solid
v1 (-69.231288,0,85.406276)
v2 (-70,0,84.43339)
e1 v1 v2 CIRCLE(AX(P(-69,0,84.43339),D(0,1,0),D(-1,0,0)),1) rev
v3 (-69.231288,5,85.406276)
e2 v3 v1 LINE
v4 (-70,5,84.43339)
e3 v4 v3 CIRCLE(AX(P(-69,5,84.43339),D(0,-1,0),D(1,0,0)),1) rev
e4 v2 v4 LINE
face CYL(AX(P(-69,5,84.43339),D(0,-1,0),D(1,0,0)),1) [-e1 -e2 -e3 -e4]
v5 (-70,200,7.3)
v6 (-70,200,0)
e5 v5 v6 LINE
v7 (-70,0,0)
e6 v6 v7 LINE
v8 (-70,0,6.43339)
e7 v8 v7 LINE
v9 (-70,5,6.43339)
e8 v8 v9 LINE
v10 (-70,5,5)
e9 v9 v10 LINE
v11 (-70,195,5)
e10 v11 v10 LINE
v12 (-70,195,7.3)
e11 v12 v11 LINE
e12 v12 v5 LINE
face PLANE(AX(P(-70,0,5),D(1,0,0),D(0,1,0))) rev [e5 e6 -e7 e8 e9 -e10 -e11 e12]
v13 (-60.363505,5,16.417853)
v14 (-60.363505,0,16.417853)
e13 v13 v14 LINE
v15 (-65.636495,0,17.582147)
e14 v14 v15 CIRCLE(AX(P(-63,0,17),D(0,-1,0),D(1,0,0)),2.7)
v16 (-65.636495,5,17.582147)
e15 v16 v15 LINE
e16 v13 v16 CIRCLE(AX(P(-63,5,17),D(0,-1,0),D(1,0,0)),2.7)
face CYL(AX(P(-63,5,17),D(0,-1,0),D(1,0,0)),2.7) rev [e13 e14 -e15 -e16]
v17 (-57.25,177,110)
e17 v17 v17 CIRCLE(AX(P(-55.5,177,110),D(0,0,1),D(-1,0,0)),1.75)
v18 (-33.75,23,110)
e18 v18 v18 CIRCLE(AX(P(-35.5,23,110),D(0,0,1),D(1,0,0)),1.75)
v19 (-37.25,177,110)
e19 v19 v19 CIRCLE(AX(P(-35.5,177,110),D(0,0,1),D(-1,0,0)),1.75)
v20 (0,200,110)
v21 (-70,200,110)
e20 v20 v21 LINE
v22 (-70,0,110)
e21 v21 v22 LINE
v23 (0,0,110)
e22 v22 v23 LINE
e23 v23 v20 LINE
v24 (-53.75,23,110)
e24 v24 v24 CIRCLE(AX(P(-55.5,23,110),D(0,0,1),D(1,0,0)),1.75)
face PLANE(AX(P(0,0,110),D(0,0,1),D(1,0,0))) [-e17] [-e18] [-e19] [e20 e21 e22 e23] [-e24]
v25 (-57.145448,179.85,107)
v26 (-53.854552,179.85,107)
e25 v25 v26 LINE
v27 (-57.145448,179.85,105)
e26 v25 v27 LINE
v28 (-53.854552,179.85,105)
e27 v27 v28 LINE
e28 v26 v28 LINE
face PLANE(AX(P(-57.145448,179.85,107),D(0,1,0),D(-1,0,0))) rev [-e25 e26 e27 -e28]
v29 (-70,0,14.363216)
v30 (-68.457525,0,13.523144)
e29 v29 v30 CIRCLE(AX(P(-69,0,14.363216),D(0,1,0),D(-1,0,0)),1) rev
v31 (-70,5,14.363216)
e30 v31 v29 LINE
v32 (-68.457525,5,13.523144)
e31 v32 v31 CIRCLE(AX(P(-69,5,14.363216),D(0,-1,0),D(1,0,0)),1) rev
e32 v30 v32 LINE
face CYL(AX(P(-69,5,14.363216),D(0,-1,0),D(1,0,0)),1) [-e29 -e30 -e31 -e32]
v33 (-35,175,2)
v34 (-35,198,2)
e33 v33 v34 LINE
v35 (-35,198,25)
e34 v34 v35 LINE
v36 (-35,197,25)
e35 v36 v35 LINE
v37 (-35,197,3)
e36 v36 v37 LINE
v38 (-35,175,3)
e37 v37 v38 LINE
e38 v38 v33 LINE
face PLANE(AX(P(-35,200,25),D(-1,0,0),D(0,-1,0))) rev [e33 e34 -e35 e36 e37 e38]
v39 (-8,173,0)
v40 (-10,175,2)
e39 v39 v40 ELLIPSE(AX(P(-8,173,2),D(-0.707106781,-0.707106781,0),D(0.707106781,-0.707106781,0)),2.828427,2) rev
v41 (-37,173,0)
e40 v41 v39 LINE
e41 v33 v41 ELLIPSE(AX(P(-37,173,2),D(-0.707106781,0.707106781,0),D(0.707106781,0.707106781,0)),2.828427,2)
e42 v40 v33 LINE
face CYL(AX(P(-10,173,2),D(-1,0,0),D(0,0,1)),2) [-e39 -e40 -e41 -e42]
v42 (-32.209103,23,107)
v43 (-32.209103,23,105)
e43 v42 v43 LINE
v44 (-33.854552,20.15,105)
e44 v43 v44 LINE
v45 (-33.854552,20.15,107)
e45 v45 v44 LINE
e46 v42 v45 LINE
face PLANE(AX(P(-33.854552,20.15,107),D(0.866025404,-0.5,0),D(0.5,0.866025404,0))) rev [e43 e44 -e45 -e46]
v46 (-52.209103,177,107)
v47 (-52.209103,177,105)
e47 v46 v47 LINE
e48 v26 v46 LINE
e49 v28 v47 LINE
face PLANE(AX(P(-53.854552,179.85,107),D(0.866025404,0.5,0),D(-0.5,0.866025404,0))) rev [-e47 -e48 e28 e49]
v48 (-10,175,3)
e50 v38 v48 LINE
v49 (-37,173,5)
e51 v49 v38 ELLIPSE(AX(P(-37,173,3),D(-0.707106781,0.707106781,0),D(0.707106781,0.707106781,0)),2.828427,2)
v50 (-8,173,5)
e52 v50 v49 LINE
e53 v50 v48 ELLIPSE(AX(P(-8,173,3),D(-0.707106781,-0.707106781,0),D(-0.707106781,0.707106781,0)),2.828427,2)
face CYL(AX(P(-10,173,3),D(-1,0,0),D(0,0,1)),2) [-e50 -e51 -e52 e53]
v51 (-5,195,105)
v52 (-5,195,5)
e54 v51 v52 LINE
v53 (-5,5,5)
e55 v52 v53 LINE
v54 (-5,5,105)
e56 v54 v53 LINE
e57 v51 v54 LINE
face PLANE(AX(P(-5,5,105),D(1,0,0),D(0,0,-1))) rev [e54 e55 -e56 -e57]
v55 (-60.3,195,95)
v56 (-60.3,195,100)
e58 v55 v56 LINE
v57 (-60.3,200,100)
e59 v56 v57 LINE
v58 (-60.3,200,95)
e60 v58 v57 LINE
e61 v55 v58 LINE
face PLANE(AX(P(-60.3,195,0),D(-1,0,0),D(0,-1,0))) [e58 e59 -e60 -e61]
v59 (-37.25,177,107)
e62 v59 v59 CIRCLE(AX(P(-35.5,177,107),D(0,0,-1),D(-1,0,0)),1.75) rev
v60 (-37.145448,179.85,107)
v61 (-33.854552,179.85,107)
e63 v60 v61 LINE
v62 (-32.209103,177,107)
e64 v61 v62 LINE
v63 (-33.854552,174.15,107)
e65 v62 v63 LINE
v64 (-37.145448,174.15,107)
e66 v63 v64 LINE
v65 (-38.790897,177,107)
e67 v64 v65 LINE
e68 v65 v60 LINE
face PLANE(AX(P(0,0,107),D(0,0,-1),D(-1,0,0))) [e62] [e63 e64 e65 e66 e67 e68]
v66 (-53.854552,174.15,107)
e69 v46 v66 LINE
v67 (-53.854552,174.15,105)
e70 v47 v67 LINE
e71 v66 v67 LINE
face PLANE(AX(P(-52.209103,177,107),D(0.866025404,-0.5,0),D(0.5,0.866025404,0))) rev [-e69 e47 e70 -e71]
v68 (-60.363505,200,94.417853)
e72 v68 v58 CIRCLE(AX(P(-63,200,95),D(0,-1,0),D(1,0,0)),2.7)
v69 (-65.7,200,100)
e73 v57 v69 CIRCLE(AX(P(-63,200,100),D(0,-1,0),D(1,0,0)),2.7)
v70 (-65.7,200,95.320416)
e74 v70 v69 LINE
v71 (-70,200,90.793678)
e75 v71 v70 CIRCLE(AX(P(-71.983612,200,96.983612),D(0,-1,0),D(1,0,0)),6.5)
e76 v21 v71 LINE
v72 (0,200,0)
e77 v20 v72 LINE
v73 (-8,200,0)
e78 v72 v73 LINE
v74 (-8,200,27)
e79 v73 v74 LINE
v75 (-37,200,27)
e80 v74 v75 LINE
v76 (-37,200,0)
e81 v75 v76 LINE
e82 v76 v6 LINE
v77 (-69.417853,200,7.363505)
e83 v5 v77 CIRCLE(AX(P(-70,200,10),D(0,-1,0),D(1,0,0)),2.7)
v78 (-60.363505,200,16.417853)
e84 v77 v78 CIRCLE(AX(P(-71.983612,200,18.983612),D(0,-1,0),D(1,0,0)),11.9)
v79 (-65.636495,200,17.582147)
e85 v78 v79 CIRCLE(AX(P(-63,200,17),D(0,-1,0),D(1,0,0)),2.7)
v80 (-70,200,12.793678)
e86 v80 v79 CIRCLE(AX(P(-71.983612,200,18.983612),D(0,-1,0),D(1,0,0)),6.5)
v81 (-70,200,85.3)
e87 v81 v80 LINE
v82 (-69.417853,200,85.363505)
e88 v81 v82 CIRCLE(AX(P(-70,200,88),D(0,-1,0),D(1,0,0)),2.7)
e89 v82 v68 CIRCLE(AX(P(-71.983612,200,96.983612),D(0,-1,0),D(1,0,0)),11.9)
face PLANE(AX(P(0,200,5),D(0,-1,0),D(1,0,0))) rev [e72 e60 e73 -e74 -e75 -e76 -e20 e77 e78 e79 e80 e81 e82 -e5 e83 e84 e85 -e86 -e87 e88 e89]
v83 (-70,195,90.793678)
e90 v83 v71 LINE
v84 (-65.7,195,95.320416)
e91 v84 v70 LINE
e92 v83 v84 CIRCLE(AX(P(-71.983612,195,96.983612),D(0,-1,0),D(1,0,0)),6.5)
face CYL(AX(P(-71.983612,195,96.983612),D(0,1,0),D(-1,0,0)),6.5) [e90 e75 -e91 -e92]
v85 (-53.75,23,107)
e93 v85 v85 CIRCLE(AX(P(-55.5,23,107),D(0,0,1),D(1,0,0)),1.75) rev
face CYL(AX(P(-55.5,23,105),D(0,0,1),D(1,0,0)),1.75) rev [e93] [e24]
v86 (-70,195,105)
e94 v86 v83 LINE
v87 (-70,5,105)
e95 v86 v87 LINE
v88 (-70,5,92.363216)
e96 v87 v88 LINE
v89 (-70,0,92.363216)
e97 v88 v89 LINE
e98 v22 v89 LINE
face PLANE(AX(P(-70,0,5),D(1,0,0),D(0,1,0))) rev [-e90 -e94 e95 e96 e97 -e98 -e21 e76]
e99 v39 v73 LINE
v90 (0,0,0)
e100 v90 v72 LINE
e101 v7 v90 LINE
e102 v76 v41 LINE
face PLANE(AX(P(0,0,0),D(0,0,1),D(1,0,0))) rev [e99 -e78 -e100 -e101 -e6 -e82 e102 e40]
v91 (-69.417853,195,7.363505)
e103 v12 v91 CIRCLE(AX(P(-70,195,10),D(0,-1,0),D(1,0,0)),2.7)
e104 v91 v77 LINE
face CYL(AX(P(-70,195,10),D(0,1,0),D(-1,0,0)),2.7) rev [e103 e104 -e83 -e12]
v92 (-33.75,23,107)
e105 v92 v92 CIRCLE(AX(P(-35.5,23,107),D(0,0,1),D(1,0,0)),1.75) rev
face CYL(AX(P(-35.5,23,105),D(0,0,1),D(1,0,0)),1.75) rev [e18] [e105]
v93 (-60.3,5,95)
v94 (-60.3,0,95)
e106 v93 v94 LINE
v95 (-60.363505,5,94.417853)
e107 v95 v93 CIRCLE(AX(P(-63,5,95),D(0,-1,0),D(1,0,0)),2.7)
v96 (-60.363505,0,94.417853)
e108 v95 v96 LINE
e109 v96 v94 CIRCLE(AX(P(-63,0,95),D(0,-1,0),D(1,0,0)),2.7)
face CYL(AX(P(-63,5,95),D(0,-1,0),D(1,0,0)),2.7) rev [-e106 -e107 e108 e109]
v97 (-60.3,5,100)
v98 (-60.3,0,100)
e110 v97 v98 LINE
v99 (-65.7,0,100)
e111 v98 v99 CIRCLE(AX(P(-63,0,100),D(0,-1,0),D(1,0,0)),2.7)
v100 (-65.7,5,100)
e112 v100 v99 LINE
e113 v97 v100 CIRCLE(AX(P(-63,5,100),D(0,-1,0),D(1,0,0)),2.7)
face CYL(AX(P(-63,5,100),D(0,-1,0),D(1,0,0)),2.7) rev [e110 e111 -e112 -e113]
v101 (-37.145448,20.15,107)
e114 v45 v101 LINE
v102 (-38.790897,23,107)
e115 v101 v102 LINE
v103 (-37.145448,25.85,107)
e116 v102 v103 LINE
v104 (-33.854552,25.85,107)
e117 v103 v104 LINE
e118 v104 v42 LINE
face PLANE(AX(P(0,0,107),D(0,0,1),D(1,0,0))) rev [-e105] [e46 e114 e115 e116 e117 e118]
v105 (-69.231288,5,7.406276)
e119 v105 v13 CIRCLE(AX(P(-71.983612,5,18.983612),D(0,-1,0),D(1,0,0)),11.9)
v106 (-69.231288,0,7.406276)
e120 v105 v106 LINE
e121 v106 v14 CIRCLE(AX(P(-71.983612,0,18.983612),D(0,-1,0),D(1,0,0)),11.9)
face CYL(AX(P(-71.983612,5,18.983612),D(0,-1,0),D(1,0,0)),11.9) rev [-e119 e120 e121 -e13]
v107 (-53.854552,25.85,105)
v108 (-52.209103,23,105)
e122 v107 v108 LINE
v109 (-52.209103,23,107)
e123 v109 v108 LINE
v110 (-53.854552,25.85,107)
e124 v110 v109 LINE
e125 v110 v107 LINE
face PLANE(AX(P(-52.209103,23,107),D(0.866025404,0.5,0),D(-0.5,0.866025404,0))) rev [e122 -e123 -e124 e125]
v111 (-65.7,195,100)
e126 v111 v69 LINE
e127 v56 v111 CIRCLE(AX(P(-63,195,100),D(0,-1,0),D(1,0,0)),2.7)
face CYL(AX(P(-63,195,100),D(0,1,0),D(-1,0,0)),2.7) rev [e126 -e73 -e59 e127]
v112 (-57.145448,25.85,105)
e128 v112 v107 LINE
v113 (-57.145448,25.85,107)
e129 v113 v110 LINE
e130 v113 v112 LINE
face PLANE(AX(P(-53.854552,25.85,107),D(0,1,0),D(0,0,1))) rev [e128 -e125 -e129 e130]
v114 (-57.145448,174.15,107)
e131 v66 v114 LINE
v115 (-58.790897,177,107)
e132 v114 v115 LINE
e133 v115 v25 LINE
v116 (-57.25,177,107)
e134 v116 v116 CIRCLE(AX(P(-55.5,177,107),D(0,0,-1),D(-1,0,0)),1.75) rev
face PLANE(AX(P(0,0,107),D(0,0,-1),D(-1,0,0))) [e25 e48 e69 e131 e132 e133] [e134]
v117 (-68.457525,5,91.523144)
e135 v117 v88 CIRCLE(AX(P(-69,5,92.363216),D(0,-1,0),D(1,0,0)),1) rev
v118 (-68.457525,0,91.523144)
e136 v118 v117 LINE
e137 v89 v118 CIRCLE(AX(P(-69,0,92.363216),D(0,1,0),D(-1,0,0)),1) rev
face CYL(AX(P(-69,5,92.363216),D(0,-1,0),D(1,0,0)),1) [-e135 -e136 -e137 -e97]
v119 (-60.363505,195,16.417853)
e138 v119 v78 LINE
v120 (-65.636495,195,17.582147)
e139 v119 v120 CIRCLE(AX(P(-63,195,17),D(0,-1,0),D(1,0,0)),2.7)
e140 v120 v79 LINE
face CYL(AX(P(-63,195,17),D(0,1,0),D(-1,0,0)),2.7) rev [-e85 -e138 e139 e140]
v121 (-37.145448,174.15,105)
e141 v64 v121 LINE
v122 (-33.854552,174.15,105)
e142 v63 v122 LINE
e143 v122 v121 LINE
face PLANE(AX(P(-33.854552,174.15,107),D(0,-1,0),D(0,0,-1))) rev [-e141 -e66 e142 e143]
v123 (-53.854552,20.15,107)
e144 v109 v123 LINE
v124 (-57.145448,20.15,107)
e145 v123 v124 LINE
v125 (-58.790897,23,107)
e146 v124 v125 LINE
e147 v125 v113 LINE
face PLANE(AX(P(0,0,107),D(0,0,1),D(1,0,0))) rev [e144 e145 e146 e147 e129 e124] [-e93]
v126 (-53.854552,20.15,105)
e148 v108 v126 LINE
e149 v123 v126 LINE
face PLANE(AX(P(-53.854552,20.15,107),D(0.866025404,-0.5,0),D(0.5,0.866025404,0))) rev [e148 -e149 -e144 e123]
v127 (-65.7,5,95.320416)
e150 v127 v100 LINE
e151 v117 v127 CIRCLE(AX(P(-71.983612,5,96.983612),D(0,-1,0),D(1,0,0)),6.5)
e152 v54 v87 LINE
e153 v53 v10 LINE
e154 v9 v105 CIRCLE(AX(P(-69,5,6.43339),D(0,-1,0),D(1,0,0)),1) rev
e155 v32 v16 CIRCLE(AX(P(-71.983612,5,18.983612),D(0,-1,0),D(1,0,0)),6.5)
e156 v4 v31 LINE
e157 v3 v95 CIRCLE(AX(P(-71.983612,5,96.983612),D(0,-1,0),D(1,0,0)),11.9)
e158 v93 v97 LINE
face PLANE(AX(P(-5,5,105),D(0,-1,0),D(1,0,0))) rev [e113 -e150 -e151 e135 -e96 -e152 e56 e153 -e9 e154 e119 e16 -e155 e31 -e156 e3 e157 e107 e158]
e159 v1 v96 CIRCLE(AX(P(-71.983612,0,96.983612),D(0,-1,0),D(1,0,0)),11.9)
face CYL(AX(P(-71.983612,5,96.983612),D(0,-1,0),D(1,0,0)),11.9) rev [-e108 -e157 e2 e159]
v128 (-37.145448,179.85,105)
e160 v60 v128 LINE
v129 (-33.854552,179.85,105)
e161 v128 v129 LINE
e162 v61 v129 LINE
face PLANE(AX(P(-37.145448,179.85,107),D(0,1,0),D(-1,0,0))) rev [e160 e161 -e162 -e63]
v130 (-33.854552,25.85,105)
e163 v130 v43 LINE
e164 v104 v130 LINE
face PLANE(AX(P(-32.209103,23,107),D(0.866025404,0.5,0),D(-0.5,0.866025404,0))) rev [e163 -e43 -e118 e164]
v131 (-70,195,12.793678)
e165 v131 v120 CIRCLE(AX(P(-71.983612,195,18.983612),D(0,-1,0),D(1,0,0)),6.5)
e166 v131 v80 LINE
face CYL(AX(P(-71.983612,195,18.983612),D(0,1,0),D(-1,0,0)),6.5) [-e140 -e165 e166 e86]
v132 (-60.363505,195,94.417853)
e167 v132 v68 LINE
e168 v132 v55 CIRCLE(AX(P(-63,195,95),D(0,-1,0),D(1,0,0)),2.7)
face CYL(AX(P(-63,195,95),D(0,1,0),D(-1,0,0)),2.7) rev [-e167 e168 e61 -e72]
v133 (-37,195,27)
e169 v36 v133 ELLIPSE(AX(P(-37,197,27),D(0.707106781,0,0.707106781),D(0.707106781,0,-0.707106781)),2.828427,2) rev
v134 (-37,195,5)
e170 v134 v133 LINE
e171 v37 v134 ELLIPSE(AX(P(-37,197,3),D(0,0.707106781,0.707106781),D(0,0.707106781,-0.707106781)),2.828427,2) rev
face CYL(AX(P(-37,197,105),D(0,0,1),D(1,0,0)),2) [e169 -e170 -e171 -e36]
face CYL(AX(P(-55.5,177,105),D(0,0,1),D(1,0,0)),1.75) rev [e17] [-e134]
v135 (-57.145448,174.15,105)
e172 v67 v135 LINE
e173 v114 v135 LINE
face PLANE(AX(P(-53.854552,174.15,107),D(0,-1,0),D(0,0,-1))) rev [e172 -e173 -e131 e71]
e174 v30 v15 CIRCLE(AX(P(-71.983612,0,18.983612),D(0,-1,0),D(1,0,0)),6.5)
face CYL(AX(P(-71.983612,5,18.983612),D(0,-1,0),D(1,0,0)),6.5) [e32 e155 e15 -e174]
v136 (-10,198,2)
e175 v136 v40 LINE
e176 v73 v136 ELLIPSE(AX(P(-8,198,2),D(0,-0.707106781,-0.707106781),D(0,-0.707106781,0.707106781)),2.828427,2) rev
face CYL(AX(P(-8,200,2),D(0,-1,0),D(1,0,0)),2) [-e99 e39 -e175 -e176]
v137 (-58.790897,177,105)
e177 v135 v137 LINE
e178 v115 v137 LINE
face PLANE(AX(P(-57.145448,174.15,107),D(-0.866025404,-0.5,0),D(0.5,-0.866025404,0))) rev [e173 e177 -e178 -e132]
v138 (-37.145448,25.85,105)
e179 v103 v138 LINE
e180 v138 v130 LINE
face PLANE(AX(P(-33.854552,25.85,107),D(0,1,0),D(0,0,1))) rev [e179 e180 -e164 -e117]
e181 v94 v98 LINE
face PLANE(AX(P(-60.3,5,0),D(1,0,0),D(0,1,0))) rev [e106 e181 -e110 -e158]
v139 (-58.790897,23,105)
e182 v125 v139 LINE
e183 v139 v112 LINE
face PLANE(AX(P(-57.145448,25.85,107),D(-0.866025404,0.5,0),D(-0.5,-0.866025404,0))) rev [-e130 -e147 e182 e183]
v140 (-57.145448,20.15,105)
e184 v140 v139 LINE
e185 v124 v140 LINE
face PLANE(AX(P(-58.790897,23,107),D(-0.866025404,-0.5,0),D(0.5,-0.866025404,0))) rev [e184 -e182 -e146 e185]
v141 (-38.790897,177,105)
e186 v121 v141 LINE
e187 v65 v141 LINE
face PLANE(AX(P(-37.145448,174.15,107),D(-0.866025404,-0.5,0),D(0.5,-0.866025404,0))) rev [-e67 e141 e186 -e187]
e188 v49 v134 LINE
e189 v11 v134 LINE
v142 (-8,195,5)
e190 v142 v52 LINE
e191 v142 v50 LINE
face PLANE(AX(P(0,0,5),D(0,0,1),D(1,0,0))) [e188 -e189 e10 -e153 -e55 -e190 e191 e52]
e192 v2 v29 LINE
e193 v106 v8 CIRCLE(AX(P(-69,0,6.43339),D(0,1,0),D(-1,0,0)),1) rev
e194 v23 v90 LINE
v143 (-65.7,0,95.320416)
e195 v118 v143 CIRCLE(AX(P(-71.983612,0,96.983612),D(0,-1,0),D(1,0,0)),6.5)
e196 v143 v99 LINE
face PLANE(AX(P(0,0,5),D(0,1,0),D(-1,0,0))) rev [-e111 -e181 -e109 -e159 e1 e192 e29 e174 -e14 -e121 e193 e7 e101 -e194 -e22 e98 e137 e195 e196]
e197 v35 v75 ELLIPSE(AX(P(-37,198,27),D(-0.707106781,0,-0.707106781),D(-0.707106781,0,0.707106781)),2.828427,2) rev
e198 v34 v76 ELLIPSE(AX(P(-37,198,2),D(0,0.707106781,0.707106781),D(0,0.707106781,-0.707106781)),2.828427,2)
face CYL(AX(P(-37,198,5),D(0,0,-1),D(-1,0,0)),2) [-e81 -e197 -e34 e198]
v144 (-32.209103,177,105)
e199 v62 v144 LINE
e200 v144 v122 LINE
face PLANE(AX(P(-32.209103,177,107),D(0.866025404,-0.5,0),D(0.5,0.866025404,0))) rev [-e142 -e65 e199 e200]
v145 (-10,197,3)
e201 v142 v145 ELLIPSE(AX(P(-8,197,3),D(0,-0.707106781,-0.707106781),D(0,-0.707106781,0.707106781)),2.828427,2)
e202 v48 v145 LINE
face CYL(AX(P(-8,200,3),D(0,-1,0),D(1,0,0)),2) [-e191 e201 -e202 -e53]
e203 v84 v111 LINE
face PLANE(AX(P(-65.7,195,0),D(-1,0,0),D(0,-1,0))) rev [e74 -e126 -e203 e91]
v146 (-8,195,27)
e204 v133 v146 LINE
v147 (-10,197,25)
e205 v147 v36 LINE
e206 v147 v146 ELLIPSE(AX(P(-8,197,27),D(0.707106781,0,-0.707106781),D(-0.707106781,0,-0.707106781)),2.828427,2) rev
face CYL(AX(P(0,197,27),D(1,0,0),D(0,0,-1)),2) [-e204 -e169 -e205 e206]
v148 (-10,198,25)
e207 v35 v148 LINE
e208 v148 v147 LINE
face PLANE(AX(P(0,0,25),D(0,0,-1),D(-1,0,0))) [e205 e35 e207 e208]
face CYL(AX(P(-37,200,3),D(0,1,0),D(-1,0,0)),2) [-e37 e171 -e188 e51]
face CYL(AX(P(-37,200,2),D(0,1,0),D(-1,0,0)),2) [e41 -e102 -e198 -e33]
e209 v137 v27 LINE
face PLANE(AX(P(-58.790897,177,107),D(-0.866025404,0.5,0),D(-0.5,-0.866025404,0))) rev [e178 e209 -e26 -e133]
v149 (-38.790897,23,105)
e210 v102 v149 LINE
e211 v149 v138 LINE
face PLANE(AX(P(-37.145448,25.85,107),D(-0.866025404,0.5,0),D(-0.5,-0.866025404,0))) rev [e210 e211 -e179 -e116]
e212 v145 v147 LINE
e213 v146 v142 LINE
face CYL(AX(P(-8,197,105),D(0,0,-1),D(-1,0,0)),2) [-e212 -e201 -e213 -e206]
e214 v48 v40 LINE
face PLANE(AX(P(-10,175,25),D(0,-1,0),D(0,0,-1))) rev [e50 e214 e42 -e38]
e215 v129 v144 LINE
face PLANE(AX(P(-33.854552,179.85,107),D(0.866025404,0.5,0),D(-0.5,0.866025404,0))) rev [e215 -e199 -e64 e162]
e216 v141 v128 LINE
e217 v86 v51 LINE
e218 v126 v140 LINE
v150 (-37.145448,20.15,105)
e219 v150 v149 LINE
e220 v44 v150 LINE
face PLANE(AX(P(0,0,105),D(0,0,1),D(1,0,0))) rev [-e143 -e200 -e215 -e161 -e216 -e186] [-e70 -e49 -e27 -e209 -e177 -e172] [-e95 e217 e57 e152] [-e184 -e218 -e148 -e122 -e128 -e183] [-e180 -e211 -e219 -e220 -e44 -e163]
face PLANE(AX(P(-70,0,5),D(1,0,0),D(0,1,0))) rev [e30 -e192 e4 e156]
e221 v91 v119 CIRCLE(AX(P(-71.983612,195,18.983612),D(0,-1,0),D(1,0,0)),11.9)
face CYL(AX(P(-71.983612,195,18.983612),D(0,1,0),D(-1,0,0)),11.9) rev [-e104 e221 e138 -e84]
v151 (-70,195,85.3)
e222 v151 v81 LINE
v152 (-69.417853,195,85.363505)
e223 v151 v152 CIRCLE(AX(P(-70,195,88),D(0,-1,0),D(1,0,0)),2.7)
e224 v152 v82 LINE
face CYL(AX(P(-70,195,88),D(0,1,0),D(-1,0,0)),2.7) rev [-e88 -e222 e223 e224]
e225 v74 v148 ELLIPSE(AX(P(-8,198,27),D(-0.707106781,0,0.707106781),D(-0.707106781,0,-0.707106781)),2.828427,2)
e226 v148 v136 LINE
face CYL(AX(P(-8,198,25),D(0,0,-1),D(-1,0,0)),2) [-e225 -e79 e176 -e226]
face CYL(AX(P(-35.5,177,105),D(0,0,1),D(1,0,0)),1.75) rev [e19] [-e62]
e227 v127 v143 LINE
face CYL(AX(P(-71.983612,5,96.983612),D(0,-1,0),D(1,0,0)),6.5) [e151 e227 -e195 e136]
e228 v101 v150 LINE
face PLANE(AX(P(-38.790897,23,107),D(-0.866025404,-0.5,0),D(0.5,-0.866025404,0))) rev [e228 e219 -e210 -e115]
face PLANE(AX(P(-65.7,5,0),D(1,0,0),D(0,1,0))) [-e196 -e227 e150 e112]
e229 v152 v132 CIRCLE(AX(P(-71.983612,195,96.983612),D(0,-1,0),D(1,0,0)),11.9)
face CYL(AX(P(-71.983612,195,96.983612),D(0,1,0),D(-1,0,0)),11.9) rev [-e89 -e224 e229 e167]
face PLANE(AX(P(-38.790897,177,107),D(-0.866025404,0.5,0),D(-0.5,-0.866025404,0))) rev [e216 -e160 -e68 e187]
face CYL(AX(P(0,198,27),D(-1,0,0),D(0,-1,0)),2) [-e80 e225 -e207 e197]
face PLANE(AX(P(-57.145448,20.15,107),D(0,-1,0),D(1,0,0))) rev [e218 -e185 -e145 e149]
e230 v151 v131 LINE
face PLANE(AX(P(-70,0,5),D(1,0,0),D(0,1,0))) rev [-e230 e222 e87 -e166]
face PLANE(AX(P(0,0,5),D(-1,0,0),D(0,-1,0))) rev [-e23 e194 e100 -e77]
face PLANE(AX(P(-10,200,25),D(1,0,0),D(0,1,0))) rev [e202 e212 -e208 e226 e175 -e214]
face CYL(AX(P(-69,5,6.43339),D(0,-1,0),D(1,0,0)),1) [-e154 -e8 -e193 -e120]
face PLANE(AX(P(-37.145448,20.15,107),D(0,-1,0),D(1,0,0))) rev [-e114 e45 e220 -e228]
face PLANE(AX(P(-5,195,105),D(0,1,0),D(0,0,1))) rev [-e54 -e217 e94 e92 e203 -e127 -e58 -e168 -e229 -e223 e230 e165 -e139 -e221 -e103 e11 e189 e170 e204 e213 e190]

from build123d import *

# Parameters (mm, degrees)
ESQUISSE1_W             = 70
ESQUISSE1_H             = 200
BOSS_EXTRU_1_DEPTH      = 5
BOSS_EXTRU_2_DEPTH      = 100
ESQUISSE3_W             = 70
ESQUISSE3_H             = 200
BOSS_EXTRU_3_DEPTH      = 5
ENL_V_MAT_EXTRU_2_DEPTH = 5
CONG_3_R                = 1
ESQUISSE7_R             = 1.75
ENL_V_MAT_EXTRU_4_DEPTH = 5
ENL_V_MAT_EXTRU_5_DEPTH = 2
ESQUISSE9_W             = 25
ESQUISSE9_H             = 25
ENL_V_MAT_EXTRU_6_DEPTH = 25
CONG_4_R                = 2


with BuildPart() as part:
    # Esquisse1 → Boss.-Extru.1 (new body)
    with BuildSketch(Plane.XY):
        with Locations((-35, 100)):
            Rectangle(ESQUISSE1_W, ESQUISSE1_H)
    extrude(amount=BOSS_EXTRU_1_DEPTH)

    # Esquisse2 → Boss.-Extru.2 (add)
    with BuildSketch(Plane.XY.offset(5)):
        Polygon((0, 0), (-70, 0), (-70, 5), (-5, 5), (-5, 195), (-70, 195), (-70, 200), (0, 200), align=None)
    extrude(amount=BOSS_EXTRU_2_DEPTH)

    # Esquisse3 → Boss.-Extru.3 (add)
    with BuildSketch(Plane.XY.offset(105)):
        with Locations((-35, 100)):
            Rectangle(ESQUISSE3_W, ESQUISSE3_H)
    extrude(amount=BOSS_EXTRU_3_DEPTH)

    # Esquisse5 → Enlèv. mat.-Extru.2 (cut)
    with BuildSketch(Plane.XZ):
        with BuildLine():
            ThreePointArc((-65.636494811, 17.582146985), (-67.179174329, 14.605555398), (-70, 12.793677891))
            Line((-70, 12.793677891), (-70, 7.3))
            ThreePointArc((-70, 7.3), (-69.707199718, 7.315923251), (-69.417853015, 7.363505189))
            ThreePointArc((-69.417853015, 7.363505189), (-63.569041252, 10.569041252), (-60.363505189, 16.417853015))
            ThreePointArc((-60.363505189, 16.417853015), (-62.417853015, 19.636494811), (-65.636494811, 17.582146985))
        make_face()
        with BuildLine():
            ThreePointArc((-60.363505189, 94.417853015), (-63.292800282, 92.315923251), (-65.7, 95))
            Line((-65.7, 95), (-65.7, 95.320415964))
            ThreePointArc((-65.7, 95.320415964), (-67.270907084, 92.506959978), (-70, 90.793677891))
            Line((-70, 90.793677891), (-70, 85.3))
            ThreePointArc((-70, 85.3), (-69.707199718, 85.315923251), (-69.417853015, 85.363505189))
            ThreePointArc((-69.417853015, 85.363505189), (-63.569041252, 88.569041252), (-60.363505189, 94.417853015))
        make_face()
        with BuildLine():
            Line((-65.7, 95.320415964), (-65.7, 95))
            ThreePointArc((-65.7, 95), (-63.292800282, 92.315923251), (-60.363505189, 94.417853015))
            ThreePointArc((-60.363505189, 94.417853015), (-60.315923251, 94.707199718), (-60.3, 95))
            ThreePointArc((-60.3, 95), (-62.707199718, 97.684076749), (-65.636494811, 95.582146985))
            ThreePointArc((-65.636494811, 95.582146985), (-65.666891669, 95.450952525), (-65.7, 95.320415964))
        make_face()
        with BuildLine():
            Line((-65.7, 100), (-65.7, 95.320415964))
            ThreePointArc((-65.7, 95.320415964), (-65.666891669, 95.450952525), (-65.636494811, 95.582146985))
            ThreePointArc((-65.636494811, 95.582146985), (-62.707199718, 97.684076749), (-60.3, 95))
            Line((-60.3, 95), (-60.3, 100))
            ThreePointArc((-60.3, 100), (-63, 102.7), (-65.7, 100))
        make_face()
    enl_v_mat_extru_2 = extrude(amount=-ENL_V_MAT_EXTRU_2_DEPTH, mode=Mode.SUBTRACT)

    # Symétrie1: Enlèv. mat.-Extru.2 across plane
    add(enl_v_mat_extru_2.mirror(Plane.ZX.offset(100)), mode=Mode.SUBTRACT)

    # Congé3
    cong_3_edges = [part.edges().sort_by_distance(p)[0] for p in [
        (-70, 2.5, 90.793677891),
        (-70, 2.5, 85.3),
        (-70, 2.5, 12.793677891),
        (-70, 2.5, 7.3),
    ]]
    fillet(cong_3_edges, radius=CONG_3_R)

    # Esquisse7 → Enlèv. mat.-Extru.4 (cut)
    with BuildSketch(Plane.XY.offset(110)):
        with Locations((-55.5, 23)):
            Circle(ESQUISSE7_R)
        with Locations((-35.5, 23)):
            Circle(ESQUISSE7_R)
        with Locations((-55.5, 177)):
            Circle(ESQUISSE7_R)
        with Locations((-35.5, 177)):
            Circle(ESQUISSE7_R)
    extrude(amount=-ENL_V_MAT_EXTRU_4_DEPTH, mode=Mode.SUBTRACT)

    # Esquisse8 → Enlèv. mat.-Extru.5 (cut)
    with BuildSketch(Plane(origin=(0, 0, 105), x_dir=(-1, 0, 0), z_dir=(0, 0, -1))):
        Polygon((33.854551733, 25.85), (37.145448267, 25.85), (38.790896534, 23), (37.145448267, 20.15), (33.854551733, 20.15), (32.209103466, 23), align=None)
        Polygon((53.854551733, 25.85), (57.145448267, 25.85), (58.790896534, 23), (57.145448267, 20.15), (53.854551733, 20.15), (52.209103466, 23), align=None)
        Polygon((52.209103466, 177), (53.854551733, 174.15), (57.145448267, 174.15), (58.790896534, 177), (57.145448267, 179.85), (53.854551733, 179.85), align=None)
        Polygon((32.209103466, 177), (33.854551733, 174.15), (37.145448267, 174.15), (38.790896534, 177), (37.145448267, 179.85), (33.854551733, 179.85), align=None)
    extrude(amount=-ENL_V_MAT_EXTRU_5_DEPTH, mode=Mode.SUBTRACT)

    # Esquisse9 → Enlèv. mat.-Extru.6 (cut)
    with BuildSketch(Plane(origin=(0, 0, 0), x_dir=(-1, 0, 0), z_dir=(0, 0, -1))):
        with Locations((22.5, 187.5)):
            Rectangle(ESQUISSE9_W, ESQUISSE9_H)
    extrude(amount=-ENL_V_MAT_EXTRU_6_DEPTH, mode=Mode.SUBTRACT)

    # Congé4
    cong_4_edges = [part.edges().sort_by_distance(p)[0] for p in [
        (-35, 185, 5),
        (-22.5, 175, 5),
        (-10, 185, 5),
        (-10, 195, 15),
        (-22.5, 200, 25),
        (-22.5, 195, 25),
        (-35, 200, 12.5),
        (-35, 195, 15),
        (-10, 200, 12.5),
        (-10, 187.5, 0),
        (-35, 187.5, 0),
        (-22.5, 175, 0),
    ]]
    fillet(cong_4_edges, radius=CONG_4_R)


solid = part.part
